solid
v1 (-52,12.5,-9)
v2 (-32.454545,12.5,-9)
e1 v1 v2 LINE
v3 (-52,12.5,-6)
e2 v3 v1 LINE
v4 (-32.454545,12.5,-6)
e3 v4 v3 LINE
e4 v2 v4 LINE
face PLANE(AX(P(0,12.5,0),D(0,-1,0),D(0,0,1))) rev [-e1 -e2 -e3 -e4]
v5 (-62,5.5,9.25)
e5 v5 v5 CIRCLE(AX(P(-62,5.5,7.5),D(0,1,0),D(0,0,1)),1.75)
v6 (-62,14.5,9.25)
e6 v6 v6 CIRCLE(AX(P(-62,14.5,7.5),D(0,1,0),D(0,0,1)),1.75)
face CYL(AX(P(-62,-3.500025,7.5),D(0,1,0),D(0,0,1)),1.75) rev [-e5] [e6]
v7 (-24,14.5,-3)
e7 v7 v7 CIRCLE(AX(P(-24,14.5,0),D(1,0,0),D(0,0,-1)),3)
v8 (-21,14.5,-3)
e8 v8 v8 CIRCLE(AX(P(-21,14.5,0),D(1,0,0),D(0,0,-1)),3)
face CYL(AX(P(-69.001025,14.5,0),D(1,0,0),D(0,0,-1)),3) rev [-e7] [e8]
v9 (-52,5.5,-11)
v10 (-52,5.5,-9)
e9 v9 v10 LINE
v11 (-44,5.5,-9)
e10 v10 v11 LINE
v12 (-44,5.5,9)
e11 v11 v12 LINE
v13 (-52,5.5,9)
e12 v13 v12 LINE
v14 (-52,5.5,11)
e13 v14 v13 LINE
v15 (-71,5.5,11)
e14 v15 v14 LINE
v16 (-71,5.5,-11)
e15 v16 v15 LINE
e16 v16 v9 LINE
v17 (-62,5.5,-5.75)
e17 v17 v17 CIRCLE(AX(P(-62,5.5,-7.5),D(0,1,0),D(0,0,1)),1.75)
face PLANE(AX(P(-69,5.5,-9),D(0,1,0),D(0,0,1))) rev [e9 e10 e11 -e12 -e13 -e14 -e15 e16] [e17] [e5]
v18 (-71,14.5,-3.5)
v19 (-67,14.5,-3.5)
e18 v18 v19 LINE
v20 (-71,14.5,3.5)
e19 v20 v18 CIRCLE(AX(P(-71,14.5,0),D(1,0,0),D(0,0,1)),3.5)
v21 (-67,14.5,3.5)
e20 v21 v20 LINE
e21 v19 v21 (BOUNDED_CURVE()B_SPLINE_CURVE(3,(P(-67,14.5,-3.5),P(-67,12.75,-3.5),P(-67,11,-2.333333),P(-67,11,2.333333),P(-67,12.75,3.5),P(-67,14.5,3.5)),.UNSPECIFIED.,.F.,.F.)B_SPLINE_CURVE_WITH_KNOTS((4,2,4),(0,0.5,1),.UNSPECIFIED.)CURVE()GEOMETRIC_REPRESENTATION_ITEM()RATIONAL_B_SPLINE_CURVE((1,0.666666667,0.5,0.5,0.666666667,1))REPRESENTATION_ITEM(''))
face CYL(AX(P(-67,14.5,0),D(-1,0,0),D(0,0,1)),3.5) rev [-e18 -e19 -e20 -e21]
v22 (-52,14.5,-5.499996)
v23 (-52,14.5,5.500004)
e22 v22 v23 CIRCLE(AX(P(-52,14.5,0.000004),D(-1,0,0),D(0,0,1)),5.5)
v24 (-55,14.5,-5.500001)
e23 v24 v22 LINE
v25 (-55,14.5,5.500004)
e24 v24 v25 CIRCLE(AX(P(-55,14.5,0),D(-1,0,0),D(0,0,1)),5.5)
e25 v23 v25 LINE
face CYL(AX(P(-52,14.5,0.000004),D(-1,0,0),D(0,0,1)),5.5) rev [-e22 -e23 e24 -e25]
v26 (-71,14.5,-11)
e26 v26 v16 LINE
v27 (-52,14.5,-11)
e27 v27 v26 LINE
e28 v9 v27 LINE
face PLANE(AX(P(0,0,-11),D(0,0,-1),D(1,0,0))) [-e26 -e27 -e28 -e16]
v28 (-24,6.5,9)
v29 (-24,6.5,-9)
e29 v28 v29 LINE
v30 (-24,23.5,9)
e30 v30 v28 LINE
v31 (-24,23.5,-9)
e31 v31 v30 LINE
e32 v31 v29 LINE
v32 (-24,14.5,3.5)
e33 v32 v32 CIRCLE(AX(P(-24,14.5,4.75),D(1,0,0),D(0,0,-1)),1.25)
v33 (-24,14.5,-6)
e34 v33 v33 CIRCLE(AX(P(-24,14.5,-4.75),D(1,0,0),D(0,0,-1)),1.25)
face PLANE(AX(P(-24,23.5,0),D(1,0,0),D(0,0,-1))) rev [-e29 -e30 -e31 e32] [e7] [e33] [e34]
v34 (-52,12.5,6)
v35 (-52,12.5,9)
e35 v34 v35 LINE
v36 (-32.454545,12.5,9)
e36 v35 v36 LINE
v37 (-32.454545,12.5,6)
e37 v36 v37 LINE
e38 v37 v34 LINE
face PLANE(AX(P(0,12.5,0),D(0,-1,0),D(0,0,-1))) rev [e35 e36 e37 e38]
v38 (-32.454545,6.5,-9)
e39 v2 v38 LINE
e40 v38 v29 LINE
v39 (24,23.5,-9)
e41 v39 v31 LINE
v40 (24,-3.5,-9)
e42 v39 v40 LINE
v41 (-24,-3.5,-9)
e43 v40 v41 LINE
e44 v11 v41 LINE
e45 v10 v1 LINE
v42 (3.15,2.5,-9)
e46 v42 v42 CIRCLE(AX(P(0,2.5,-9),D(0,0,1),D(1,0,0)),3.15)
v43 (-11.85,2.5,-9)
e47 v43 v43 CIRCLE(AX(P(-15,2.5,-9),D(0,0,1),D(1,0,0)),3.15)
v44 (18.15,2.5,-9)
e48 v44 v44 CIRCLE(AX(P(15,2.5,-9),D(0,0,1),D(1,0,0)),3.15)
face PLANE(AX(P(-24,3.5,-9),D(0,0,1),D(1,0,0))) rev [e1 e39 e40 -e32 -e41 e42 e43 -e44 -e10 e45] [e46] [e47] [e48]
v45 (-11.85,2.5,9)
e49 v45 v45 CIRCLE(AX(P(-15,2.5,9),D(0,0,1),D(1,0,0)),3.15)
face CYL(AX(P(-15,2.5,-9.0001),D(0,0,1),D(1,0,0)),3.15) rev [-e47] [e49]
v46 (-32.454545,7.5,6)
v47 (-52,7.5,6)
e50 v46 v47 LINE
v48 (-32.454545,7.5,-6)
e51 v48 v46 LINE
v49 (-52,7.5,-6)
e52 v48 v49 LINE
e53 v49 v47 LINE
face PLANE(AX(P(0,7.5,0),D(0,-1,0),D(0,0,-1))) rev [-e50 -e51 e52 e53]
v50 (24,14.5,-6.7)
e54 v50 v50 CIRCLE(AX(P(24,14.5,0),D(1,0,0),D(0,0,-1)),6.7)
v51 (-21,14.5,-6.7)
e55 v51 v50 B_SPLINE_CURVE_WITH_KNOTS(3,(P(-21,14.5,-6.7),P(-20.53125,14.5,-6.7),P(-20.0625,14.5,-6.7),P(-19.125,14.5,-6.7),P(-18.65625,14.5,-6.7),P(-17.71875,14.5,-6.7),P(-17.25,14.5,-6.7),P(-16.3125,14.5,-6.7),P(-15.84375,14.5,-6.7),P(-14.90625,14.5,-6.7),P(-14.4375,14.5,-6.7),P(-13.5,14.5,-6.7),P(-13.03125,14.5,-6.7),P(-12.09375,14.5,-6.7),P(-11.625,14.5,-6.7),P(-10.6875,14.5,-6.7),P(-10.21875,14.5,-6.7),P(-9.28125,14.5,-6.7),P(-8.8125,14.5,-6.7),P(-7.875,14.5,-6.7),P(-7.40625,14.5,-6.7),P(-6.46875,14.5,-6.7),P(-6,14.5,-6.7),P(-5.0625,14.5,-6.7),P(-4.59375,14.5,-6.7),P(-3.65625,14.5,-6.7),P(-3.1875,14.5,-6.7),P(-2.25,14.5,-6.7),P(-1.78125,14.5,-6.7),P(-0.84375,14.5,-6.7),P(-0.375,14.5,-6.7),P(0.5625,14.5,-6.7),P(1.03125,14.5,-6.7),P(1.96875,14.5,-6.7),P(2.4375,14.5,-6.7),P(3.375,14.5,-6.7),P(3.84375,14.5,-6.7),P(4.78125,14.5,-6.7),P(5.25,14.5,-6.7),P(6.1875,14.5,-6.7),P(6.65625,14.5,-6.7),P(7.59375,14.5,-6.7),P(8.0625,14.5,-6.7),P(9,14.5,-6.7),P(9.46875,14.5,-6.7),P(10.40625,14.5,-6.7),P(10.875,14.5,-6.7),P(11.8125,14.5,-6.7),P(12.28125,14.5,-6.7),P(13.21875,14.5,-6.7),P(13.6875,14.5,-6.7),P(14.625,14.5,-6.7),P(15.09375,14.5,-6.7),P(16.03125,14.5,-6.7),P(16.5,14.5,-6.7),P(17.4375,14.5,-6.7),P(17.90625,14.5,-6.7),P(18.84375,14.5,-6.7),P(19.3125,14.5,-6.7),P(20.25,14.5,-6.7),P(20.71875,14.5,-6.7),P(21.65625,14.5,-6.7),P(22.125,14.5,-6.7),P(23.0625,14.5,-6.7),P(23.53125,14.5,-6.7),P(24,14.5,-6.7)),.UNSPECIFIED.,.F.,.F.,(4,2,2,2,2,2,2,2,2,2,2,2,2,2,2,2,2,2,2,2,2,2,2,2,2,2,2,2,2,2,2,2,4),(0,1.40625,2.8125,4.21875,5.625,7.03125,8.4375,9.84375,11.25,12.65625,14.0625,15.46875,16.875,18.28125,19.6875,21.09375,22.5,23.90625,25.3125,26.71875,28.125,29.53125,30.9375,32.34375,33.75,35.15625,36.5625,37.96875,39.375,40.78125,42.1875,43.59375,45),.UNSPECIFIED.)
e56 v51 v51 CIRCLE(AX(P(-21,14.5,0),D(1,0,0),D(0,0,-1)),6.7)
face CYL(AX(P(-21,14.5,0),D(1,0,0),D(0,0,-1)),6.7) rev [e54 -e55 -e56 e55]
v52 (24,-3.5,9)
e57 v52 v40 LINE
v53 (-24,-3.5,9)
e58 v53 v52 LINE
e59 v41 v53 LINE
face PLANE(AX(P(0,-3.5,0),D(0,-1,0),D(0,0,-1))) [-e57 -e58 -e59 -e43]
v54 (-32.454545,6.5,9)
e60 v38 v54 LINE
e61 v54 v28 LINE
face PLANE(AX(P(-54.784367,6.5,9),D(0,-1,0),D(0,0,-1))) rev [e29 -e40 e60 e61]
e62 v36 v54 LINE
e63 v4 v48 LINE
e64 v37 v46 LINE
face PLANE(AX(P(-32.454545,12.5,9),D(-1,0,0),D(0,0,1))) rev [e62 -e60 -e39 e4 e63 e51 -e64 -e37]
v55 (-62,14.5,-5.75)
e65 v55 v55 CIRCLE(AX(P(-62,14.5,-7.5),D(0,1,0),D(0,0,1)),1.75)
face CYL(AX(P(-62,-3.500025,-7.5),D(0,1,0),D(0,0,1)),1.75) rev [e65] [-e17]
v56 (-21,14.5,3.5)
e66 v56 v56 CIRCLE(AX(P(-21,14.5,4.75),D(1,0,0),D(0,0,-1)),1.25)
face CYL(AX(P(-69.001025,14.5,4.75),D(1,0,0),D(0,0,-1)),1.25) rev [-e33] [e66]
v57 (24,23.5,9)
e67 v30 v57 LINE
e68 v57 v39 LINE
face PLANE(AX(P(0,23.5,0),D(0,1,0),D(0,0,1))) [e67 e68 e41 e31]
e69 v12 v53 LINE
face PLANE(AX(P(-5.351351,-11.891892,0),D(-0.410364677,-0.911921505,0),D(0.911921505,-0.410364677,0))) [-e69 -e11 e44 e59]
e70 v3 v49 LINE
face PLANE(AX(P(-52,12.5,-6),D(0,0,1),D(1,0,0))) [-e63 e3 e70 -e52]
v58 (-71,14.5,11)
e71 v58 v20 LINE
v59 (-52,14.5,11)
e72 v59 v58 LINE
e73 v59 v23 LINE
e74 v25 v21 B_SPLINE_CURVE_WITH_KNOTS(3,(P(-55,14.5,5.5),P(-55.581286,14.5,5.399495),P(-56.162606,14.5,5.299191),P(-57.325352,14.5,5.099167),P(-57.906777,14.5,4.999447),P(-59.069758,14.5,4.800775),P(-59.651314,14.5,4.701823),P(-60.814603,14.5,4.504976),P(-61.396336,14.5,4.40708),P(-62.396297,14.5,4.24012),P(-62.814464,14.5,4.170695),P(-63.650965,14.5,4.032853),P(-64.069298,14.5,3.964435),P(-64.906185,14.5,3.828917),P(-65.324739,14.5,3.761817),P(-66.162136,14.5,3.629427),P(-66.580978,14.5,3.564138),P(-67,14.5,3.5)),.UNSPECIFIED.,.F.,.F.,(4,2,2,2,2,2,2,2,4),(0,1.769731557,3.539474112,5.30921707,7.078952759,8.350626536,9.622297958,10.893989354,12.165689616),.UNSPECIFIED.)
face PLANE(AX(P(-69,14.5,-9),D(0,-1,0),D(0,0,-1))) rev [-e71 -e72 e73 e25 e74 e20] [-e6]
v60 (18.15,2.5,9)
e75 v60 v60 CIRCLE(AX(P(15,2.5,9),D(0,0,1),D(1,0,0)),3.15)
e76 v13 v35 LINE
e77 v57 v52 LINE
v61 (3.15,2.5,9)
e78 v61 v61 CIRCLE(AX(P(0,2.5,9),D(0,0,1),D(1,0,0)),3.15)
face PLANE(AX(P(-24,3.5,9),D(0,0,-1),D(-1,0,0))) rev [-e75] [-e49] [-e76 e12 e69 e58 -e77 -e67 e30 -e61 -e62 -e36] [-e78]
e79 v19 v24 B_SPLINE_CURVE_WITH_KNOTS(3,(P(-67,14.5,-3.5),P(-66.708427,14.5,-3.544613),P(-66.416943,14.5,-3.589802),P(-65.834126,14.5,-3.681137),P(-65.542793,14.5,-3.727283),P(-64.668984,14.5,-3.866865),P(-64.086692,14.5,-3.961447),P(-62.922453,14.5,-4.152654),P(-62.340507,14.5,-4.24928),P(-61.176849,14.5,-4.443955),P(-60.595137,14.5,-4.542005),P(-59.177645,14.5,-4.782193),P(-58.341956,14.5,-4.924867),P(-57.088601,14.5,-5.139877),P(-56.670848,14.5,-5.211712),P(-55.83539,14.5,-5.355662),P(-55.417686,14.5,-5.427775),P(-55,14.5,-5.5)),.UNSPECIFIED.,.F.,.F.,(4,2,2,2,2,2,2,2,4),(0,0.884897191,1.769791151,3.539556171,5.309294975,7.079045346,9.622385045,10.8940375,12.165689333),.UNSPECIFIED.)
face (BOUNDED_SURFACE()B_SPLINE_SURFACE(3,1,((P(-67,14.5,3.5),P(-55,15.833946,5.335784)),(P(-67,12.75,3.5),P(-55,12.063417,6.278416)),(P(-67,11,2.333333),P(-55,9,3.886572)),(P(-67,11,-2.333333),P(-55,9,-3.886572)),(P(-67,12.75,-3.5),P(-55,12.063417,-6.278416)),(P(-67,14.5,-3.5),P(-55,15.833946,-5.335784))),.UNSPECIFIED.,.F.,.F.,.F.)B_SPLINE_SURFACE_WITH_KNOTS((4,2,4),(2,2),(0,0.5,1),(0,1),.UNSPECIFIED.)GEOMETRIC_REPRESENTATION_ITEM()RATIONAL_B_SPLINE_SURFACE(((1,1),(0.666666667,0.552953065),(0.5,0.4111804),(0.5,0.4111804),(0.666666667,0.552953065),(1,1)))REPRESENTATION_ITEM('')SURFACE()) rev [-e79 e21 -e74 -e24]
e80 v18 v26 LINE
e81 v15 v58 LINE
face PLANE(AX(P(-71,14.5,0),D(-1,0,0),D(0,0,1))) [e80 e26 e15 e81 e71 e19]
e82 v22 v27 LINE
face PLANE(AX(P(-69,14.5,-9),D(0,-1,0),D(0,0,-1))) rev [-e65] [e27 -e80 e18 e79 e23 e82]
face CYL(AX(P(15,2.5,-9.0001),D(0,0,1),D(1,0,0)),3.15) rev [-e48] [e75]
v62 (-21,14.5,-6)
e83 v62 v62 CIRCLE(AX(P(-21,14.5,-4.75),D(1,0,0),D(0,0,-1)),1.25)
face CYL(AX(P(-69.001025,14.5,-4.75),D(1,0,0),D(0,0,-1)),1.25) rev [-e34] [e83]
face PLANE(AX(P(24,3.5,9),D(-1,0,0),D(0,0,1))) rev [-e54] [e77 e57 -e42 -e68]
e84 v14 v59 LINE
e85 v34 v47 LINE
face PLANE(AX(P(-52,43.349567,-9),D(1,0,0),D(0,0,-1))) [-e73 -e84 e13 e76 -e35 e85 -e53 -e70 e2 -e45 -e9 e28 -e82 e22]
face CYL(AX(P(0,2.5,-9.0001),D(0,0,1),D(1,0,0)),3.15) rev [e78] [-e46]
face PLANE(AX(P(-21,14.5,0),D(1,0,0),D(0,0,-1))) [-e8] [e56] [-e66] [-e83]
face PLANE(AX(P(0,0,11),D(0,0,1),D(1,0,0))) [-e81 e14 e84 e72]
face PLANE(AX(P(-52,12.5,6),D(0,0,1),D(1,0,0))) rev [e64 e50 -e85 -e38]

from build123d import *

# Parameters (mm, degrees)
SKETCH_1_W           = 48
SKETCH_1_H           = 18
EXTRUDE_1_DEPTH      = 3.5
SKETCH_6_W           = 18
SKETCH_6_H           = 9
EXTRUDE_4_DEPTH      = 25
SKETCH_7_R           = 3.5
CUT_EXTRUDE_1_DEPTH  = 2
SKETCH_9_R           = 5.5
CUT_EXTRUDE_4_DEPTH  = 3
EXTRUDE_5_OUTLINE_W  = 48
EXTRUDE_5_OUTLINE_H  = 18
EXTRUDE_5_DEPTH      = 20
CUT_EXTRUDE_7_REACH  = 98.344
SKETCH_13_R          = 3
SKETCH_13_R_2        = 1.25
SKETCH_15_R          = 6.7
CUT_EXTRUDE_8_DEPTH  = 45
SKETCH_16_R          = 3.15
CUT_EXTRUDE_9_DEPTH  = 76.081622399
EXTRUDE_6_REACH      = 56.196
SKETCH_17_W          = 18
SKETCH_17_H          = 3
SKETCH_18_W          = 14.545454545
SKETCH_18_H          = 18
EXTRUDE_7_DEPTH      = 2
SKETCH_19_W          = 22.545454545
SKETCH_19_H          = 18
CUT_EXTRUDE_11_DEPTH = 7
SKETCH_20_W          = 19.545454545
SKETCH_20_H          = 3
EXTRUDE_8_DEPTH      = 5
SKETCH_21_W          = 17
SKETCH_21_H          = 9
EXTRUDE_9_DEPTH      = 2
SKETCH_22_R          = 1.75
CUT_EXTRUDE_12_DEPTH = 73.152616166
SKETCH_24_W          = 3
SKETCH_24_H          = 18
CUT_EXTRUDE_13_DEPTH = 1
EXTRUDE_START        = 2
EXTRUDE_10_DEPTH     = 2


with BuildPart() as part:
    # 草圖1 → 填料-伸長1 (new, symmetric)
    with BuildSketch(Plane(origin=(0, 0, 0), x_dir=(1, 0, 0), z_dir=(0, 1, 0))):
        Rectangle(SKETCH_1_W, SKETCH_1_H)
    extrude(amount=EXTRUDE_1_DEPTH, both=True)

    # Sketch 3D_3 → Loft 1 section 0
    with BuildSketch(Plane(origin=(-44, 14.5, -9), x_dir=(0, -0.447213595499958, 0.894427190999916), z_dir=(-1, 0, 0))):
        with BuildLine():
            Line((0, 0), (16.099689438, 8.049844719))
            Line((16.099689438, 8.049844719), (20.124611797, 0))
            Line((20.124611797, 0), (4.024922359, -8.049844719))
            Line((4.024922359, -8.049844719), (0, 0))
        make_face()
    # 草圖5 → Loft 1 section 1
    with BuildSketch(Plane.ZY.offset(24)):
        with BuildLine():
            Line((-9, 3.5), (9, 3.5))
            Line((9, 3.5), (9, -3.5))
            Line((9, -3.5), (-9, -3.5))
            Line((-9, -3.5), (-9, 3.5))
        make_face()
    loft()

    # 草圖6 → 填料-伸長4 (add)
    with BuildSketch(Plane.ZY.offset(44)):
        with Locations((0, 10)):
            Rectangle(SKETCH_6_W, SKETCH_6_H)
    extrude(amount=EXTRUDE_4_DEPTH)

    # 草圖7 → 除料-伸長1 (cut)
    with BuildSketch(Plane.ZY.offset(69)):
        with Locations((0, 14.5)):
            Circle(SKETCH_7_R)
    extrude(amount=-CUT_EXTRUDE_1_DEPTH, mode=Mode.SUBTRACT)

    # Loft 1 2: read off the stored shape, not the designer's step
    # Loft 1 2: loft between two sections, ruled curve by curve
    loft_1_2_from = [
        Edge.make_bspline([(-67, 14.5, 3.5), (-67, 12.75, 3.5), (-67, 11, 2.333333333), (-67, 11, -2.333333333), (-67, 12.75, -3.5), (-67, 14.5, -3.5)], [0, 0, 0, 0, 0.5, 0.5, 1, 1, 1, 1], 3, [1, 0.666666667, 0.5, 0.5, 0.666666667, 1]),
        Edge.make_line((-67, 14.5, -3.5), (-67, 14.5, 3.5)),
    ]
    loft_1_2_to = [
        Edge.make_bspline([(-55, 15.833945938, 5.335783751), (-55, 12.063417219, 6.27841593), (-55, 9, 3.886572043), (-55, 9, -3.886572043), (-55, 12.063417219, -6.27841593), (-55, 15.833945938, -5.335783751)], [0, 0, 0, 0, 0.5, 0.5, 1, 1, 1, 1], 3, [1, 0.552953065, 0.4111804, 0.4111804, 0.552953065, 1]),
        Edge.make_line((-55, 15.833945938, -5.335783751), (-55, 15.833945938, 5.335783751)),
    ]
    loft_1_2 = Solid(Shell([*[Face.make_surface_from_curves(loft_1_2_from[k], loft_1_2_to[k]) for k in range(2)], Face(Wire(loft_1_2_from)), Face(Wire(loft_1_2_to))]))
    add(loft_1_2, mode=Mode.SUBTRACT)

    # 草圖9 → 除料-伸長4 (cut)
    with BuildSketch(Plane.ZY.offset(55)):
        with Locations((3.554e-06, 14.500000002)):
            Circle(SKETCH_9_R)
    extrude(amount=-CUT_EXTRUDE_4_DEPTH, mode=Mode.SUBTRACT)

    # 填料-伸長5: read off the stored shape, not the designer's step
    # 填料-伸長5 outline → 填料-伸長5 (add)
    with BuildSketch(Plane(origin=(0, 3.5, 0), x_dir=(1, 0, 0), z_dir=(0, 1, 0))):
        Rectangle(EXTRUDE_5_OUTLINE_W, EXTRUDE_5_OUTLINE_H)
    extrude(amount=EXTRUDE_5_DEPTH)

    # 草圖13 → 除料-伸長7 (cut, up to next)
    with BuildSketch(Plane.ZY.offset(-24), mode=Mode.PRIVATE) as cut_extrude_7_sk1:
        with Locations(Location((0, 14.5, 0), (0, 0, 180))):
            Circle(SKETCH_13_R)
    cut_extrude_7_tool1 = extrude(cut_extrude_7_sk1.sketch, amount=CUT_EXTRUDE_7_REACH, mode=Mode.PRIVATE) & part.part
    # 草圖13 → 除料-伸長7 (cut, up to next)
    with BuildSketch(Plane.ZY.offset(-24), mode=Mode.PRIVATE) as cut_extrude_7_sk2:
        with Locations(Location((-4.75, 14.5, 0), (0, 0, 180))):
            Circle(SKETCH_13_R_2)
    cut_extrude_7_tool2 = extrude(cut_extrude_7_sk2.sketch, amount=CUT_EXTRUDE_7_REACH, mode=Mode.PRIVATE) & part.part
    # 草圖13 → 除料-伸長7 (cut, up to next)
    with BuildSketch(Plane.ZY.offset(-24), mode=Mode.PRIVATE) as cut_extrude_7_sk3:
        with Locations(Location((4.75, 14.5, 0), (0, 0, 180))):
            Circle(SKETCH_13_R_2)
    cut_extrude_7_tool3 = extrude(cut_extrude_7_sk3.sketch, amount=CUT_EXTRUDE_7_REACH, mode=Mode.PRIVATE) & part.part
    add(cut_extrude_7_tool1.solids().sort_by_distance((24, 14.5, 0))[0], mode=Mode.SUBTRACT)
    add(cut_extrude_7_tool2.solids().sort_by_distance((24, 14.5, -4.75))[0], mode=Mode.SUBTRACT)
    add(cut_extrude_7_tool3.solids().sort_by_distance((24, 14.5, 4.75))[0], mode=Mode.SUBTRACT)

    # 草圖15 → 除料-伸長8 (cut)
    with BuildSketch(Plane(origin=(24, 0, 0), x_dir=(0, 0, -1), z_dir=(1, 0, 0))):
        with Locations((0, 14.5)):
            Circle(SKETCH_15_R)
    extrude(amount=-CUT_EXTRUDE_8_DEPTH, mode=Mode.SUBTRACT)

    # 草圖16 → 除料-伸長9 (cut, through all)
    with BuildSketch(Plane.XY.offset(9)):
        with Locations((15, 2.5)):
            Circle(SKETCH_16_R)
        with Locations((0, 2.5)):
            Circle(SKETCH_16_R)
        with Locations((-15, 2.5)):
            Circle(SKETCH_16_R)
    extrude(amount=-CUT_EXTRUDE_9_DEPTH, mode=Mode.SUBTRACT)

    # 填料-伸長6: up to this face of the body (flat: up to its plane)
    extrude_6_end = Plane(part.part.faces().sort_by_distance((-34, 9, 0))[0])
    # 草圖17 → 填料-伸長6 (add, up to the picked face)
    with BuildSketch(Plane.ZY.offset(24), mode=Mode.PRIVATE) as extrude_6_sk1:
        with Locations((0, 5)):
            Rectangle(SKETCH_17_W, SKETCH_17_H)
    extrude_6_tool1 = split(extrude(extrude_6_sk1.sketch, amount=EXTRUDE_6_REACH, mode=Mode.PRIVATE), bisect_by=extrude_6_end, keep=Keep.BOTH, mode=Mode.PRIVATE)
    add(extrude_6_tool1.solids().sort_by(Axis((-24, 5, 0), (-1, 0, 0)))[0])

    # 草圖18 → 填料-伸長7 (add)
    with BuildSketch(Plane.XZ.offset(-5.5)):
        with Locations((-36.727272728, 0)):
            Rectangle(SKETCH_18_W, SKETCH_18_H)
    extrude(amount=-EXTRUDE_7_DEPTH)

    # 草圖19 → 除料-伸長11 (cut)
    with BuildSketch(Plane(origin=(0, 7.5, 0), x_dir=(1, 0, 0), z_dir=(0, 1, 0))):
        with Locations((-40.727272728, 0)):
            Rectangle(SKETCH_19_W, SKETCH_19_H)
    extrude(amount=CUT_EXTRUDE_11_DEPTH, mode=Mode.SUBTRACT)

    # 草圖20 → 填料-伸長8 (add)
    with BuildSketch(Plane(origin=(0, 7.5, 0), x_dir=(1, 0, 0), z_dir=(0, 1, 0))):
        with Locations((-42.227272728, -7.5)):
            Rectangle(SKETCH_20_W, SKETCH_20_H)
    extrude_8 = extrude(amount=EXTRUDE_8_DEPTH)

    # 鏡射1: 填料-伸長8 across plane
    add(extrude_8.mirror(Plane.XY))

    # 草圖21 → 填料-伸長9 (add)
    with BuildSketch(Plane.XY.offset(9)):
        with Locations((-60.5, 10)):
            Rectangle(SKETCH_21_W, SKETCH_21_H)
    extrude_9 = extrude(amount=EXTRUDE_9_DEPTH)

    # 鏡射2: 填料-伸長9 across plane
    add(extrude_9.mirror(Plane.XY))

    # 草圖22 → 除料-伸長12 (cut, through all)
    with BuildSketch(Plane(origin=(0, 14.5, 0), x_dir=(1, 0, 0), z_dir=(0, 1, 0))):
        with Locations(Location((-62, -7.5, 0), (0, 0, 270))):
            Circle(SKETCH_22_R)
        with Locations(Location((-62, 7.5, 0), (0, 0, 270))):
            Circle(SKETCH_22_R)
    extrude(amount=-CUT_EXTRUDE_12_DEPTH, mode=Mode.SUBTRACT)

    # 草圖24 → 除料-伸長13 (cut)
    with BuildSketch(Plane(origin=(0, 7.5, 0), x_dir=(1, 0, 0), z_dir=(0, 1, 0))):
        with Locations((-30.954545455, 0)):
            Rectangle(SKETCH_24_W, SKETCH_24_H)
    extrude(amount=-CUT_EXTRUDE_13_DEPTH, mode=Mode.SUBTRACT)

    # 草圖25 → 填料-伸長10 (add)
    with BuildSketch(Plane.ZY.offset(69).offset(EXTRUDE_START)):
        with BuildLine():
            Line((3.5, 14.5), (11, 14.5))
            Line((11, 14.5), (11, 5.5))
            Line((11, 5.5), (-11, 5.5))
            Line((-11, 5.5), (-11, 14.5))
            Line((-11, 14.5), (-3.5, 14.5))
            ThreePointArc((-3.5, 14.5), (0, 11), (3.5, 14.5))
        make_face()
    extrude(amount=-EXTRUDE_10_DEPTH)


solid = part.part
